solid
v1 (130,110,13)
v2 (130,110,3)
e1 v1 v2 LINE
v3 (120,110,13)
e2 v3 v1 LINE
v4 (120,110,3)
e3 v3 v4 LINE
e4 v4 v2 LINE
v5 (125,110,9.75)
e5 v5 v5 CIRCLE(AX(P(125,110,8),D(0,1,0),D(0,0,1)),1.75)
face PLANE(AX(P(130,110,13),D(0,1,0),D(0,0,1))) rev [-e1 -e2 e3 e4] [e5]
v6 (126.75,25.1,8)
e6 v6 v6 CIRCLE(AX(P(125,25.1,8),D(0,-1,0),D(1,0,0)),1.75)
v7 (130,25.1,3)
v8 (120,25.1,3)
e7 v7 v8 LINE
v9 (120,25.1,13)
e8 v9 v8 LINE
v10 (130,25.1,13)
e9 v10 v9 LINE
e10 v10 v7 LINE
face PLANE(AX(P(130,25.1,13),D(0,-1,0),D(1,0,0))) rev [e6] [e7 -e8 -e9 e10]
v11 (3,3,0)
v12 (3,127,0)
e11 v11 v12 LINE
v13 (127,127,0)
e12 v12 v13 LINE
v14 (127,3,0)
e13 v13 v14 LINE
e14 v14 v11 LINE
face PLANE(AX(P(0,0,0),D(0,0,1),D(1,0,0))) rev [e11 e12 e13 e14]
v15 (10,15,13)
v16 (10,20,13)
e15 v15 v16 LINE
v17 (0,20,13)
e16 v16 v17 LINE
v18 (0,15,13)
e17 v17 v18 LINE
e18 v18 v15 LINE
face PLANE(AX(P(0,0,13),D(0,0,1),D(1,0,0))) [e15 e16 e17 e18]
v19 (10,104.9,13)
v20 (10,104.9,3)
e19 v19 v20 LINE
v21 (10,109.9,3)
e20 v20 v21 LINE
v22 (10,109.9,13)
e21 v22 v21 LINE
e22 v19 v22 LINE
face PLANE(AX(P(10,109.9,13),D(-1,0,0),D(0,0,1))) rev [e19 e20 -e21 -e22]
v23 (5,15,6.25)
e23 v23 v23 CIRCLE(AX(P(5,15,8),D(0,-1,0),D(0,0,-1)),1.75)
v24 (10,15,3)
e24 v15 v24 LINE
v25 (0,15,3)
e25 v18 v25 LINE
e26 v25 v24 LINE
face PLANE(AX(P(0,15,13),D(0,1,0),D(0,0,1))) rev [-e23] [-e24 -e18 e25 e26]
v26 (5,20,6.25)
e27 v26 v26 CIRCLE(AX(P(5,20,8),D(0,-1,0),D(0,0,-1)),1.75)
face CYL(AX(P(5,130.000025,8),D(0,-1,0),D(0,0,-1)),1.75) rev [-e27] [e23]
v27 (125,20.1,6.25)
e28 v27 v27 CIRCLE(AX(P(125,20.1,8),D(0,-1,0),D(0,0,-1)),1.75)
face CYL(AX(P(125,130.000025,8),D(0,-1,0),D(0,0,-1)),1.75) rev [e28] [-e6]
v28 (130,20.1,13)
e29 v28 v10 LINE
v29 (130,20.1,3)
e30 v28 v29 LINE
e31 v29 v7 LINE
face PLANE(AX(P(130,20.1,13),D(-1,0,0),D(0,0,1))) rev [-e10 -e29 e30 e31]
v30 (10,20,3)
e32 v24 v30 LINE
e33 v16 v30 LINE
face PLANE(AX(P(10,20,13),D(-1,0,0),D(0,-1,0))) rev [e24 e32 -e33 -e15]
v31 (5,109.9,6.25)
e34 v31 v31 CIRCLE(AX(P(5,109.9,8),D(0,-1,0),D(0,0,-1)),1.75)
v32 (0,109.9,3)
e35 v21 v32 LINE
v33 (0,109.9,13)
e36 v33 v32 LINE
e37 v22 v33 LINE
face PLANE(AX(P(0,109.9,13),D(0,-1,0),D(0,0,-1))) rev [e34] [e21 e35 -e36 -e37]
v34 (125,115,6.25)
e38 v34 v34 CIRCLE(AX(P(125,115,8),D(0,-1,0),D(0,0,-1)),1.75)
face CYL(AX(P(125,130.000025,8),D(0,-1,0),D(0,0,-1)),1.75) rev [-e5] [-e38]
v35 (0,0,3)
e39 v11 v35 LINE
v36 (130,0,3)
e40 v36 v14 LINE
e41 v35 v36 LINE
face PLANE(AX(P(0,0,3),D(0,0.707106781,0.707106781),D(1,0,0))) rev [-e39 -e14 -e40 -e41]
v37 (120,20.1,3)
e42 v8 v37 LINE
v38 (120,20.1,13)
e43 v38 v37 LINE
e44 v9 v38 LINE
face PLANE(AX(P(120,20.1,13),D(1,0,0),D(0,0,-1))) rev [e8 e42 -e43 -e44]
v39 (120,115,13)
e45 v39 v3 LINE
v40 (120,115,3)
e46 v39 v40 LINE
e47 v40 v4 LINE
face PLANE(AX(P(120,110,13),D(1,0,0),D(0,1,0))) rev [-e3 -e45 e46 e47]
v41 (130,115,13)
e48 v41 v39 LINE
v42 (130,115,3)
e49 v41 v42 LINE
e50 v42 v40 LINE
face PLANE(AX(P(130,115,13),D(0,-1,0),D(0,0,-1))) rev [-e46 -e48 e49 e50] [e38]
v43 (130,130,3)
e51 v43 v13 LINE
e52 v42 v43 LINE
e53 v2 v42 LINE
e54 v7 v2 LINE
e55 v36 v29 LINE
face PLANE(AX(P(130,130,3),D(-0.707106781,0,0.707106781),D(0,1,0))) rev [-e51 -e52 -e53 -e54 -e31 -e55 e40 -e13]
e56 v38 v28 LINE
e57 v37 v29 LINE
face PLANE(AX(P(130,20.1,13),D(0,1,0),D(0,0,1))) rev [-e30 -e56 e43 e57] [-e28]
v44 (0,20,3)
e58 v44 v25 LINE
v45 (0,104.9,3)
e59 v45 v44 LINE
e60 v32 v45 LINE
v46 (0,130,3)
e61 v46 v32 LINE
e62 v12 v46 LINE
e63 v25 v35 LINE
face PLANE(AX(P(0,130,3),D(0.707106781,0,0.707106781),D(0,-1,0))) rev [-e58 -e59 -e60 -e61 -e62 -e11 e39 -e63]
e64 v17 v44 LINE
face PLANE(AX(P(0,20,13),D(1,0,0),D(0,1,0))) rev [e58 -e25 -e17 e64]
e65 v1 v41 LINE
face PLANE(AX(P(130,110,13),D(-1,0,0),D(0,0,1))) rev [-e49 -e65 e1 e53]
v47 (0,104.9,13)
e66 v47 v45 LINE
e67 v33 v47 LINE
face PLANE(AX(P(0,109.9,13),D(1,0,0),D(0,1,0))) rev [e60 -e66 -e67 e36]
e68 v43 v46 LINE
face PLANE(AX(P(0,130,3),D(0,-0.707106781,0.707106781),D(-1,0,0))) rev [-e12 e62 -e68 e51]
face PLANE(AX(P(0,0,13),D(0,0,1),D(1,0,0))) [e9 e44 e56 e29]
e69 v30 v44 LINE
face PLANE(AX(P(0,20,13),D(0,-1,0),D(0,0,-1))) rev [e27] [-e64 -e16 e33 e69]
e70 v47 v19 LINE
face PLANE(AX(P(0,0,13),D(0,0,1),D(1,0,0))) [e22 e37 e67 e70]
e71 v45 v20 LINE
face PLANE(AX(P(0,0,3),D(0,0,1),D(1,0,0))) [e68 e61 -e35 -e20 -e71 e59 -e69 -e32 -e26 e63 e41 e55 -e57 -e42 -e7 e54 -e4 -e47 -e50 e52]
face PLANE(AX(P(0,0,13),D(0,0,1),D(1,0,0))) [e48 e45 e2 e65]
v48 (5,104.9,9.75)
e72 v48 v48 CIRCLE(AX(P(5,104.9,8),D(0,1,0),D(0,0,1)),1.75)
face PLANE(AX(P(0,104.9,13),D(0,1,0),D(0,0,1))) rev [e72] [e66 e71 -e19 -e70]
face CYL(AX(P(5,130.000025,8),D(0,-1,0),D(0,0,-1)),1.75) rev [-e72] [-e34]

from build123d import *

# Parameters (mm, degrees)
ESQUISSE1_W             = 130
ESQUISSE1_H             = 130
BOSS_EXTRU_1_DEPTH      = 3
CHANFREIN1_SIZE         = 3
ESQUISSE2_W             = 10
ESQUISSE2_H             = 5
BOSS_EXTRU_2_DEPTH      = 10
ESQUISSE4_R             = 1.75
ENL_V_MAT_EXTRU_1_DEPTH = 175.051716452
ESQUISSE5_R             = 1.75
ENL_V_MAT_EXTRU_2_DEPTH = 171.724954239


with BuildPart() as part:
    # Esquisse1 → Boss.-Extru.1 (new body)
    with BuildSketch(Plane.XY):
        with Locations((65, 65)):
            Rectangle(ESQUISSE1_W, ESQUISSE1_H)
    extrude(amount=BOSS_EXTRU_1_DEPTH)

    # Chanfrein1
    chanfrein1_edges = [part.edges().sort_by_distance(p)[0] for p in [
        (65, 130, 0),
        (130, 65, 0),
        (65, 0, 0),
        (0, 65, 0),
    ]]
    chamfer(chanfrein1_edges, length=CHANFREIN1_SIZE - 0.0001)  # a hair under: the kernel refuses the full size

    # Esquisse2 → Boss.-Extru.2 (add)
    with BuildSketch(Plane.XY.offset(3)):
        with Locations((5, 107.4)):
            Rectangle(ESQUISSE2_W, ESQUISSE2_H)
        with Locations((5, 17.5)):
            Rectangle(ESQUISSE2_W, ESQUISSE2_H)
        with Locations((125, 22.6)):
            Rectangle(ESQUISSE2_W, ESQUISSE2_H)
        with Locations((125, 112.5)):
            Rectangle(ESQUISSE2_W, ESQUISSE2_H)
    extrude(amount=BOSS_EXTRU_2_DEPTH)

    # Esquisse4 → Enlèv. mat.-Extru.1 (cut, through all)
    with BuildSketch(Plane.XZ.offset(-15)):
        with Locations(Location((5, 8, 0), (0, 0, 270))):
            Circle(ESQUISSE4_R)
    extrude(amount=-ENL_V_MAT_EXTRU_1_DEPTH, mode=Mode.SUBTRACT)

    # Esquisse5 → Enlèv. mat.-Extru.2 (cut, through all)
    with BuildSketch(Plane.XZ.offset(-20.1)):
        with Locations(Location((125, 8, 0), (0, 0, 270))):
            Circle(ESQUISSE5_R)
    extrude(amount=-ENL_V_MAT_EXTRU_2_DEPTH, mode=Mode.SUBTRACT)


solid = part.part
